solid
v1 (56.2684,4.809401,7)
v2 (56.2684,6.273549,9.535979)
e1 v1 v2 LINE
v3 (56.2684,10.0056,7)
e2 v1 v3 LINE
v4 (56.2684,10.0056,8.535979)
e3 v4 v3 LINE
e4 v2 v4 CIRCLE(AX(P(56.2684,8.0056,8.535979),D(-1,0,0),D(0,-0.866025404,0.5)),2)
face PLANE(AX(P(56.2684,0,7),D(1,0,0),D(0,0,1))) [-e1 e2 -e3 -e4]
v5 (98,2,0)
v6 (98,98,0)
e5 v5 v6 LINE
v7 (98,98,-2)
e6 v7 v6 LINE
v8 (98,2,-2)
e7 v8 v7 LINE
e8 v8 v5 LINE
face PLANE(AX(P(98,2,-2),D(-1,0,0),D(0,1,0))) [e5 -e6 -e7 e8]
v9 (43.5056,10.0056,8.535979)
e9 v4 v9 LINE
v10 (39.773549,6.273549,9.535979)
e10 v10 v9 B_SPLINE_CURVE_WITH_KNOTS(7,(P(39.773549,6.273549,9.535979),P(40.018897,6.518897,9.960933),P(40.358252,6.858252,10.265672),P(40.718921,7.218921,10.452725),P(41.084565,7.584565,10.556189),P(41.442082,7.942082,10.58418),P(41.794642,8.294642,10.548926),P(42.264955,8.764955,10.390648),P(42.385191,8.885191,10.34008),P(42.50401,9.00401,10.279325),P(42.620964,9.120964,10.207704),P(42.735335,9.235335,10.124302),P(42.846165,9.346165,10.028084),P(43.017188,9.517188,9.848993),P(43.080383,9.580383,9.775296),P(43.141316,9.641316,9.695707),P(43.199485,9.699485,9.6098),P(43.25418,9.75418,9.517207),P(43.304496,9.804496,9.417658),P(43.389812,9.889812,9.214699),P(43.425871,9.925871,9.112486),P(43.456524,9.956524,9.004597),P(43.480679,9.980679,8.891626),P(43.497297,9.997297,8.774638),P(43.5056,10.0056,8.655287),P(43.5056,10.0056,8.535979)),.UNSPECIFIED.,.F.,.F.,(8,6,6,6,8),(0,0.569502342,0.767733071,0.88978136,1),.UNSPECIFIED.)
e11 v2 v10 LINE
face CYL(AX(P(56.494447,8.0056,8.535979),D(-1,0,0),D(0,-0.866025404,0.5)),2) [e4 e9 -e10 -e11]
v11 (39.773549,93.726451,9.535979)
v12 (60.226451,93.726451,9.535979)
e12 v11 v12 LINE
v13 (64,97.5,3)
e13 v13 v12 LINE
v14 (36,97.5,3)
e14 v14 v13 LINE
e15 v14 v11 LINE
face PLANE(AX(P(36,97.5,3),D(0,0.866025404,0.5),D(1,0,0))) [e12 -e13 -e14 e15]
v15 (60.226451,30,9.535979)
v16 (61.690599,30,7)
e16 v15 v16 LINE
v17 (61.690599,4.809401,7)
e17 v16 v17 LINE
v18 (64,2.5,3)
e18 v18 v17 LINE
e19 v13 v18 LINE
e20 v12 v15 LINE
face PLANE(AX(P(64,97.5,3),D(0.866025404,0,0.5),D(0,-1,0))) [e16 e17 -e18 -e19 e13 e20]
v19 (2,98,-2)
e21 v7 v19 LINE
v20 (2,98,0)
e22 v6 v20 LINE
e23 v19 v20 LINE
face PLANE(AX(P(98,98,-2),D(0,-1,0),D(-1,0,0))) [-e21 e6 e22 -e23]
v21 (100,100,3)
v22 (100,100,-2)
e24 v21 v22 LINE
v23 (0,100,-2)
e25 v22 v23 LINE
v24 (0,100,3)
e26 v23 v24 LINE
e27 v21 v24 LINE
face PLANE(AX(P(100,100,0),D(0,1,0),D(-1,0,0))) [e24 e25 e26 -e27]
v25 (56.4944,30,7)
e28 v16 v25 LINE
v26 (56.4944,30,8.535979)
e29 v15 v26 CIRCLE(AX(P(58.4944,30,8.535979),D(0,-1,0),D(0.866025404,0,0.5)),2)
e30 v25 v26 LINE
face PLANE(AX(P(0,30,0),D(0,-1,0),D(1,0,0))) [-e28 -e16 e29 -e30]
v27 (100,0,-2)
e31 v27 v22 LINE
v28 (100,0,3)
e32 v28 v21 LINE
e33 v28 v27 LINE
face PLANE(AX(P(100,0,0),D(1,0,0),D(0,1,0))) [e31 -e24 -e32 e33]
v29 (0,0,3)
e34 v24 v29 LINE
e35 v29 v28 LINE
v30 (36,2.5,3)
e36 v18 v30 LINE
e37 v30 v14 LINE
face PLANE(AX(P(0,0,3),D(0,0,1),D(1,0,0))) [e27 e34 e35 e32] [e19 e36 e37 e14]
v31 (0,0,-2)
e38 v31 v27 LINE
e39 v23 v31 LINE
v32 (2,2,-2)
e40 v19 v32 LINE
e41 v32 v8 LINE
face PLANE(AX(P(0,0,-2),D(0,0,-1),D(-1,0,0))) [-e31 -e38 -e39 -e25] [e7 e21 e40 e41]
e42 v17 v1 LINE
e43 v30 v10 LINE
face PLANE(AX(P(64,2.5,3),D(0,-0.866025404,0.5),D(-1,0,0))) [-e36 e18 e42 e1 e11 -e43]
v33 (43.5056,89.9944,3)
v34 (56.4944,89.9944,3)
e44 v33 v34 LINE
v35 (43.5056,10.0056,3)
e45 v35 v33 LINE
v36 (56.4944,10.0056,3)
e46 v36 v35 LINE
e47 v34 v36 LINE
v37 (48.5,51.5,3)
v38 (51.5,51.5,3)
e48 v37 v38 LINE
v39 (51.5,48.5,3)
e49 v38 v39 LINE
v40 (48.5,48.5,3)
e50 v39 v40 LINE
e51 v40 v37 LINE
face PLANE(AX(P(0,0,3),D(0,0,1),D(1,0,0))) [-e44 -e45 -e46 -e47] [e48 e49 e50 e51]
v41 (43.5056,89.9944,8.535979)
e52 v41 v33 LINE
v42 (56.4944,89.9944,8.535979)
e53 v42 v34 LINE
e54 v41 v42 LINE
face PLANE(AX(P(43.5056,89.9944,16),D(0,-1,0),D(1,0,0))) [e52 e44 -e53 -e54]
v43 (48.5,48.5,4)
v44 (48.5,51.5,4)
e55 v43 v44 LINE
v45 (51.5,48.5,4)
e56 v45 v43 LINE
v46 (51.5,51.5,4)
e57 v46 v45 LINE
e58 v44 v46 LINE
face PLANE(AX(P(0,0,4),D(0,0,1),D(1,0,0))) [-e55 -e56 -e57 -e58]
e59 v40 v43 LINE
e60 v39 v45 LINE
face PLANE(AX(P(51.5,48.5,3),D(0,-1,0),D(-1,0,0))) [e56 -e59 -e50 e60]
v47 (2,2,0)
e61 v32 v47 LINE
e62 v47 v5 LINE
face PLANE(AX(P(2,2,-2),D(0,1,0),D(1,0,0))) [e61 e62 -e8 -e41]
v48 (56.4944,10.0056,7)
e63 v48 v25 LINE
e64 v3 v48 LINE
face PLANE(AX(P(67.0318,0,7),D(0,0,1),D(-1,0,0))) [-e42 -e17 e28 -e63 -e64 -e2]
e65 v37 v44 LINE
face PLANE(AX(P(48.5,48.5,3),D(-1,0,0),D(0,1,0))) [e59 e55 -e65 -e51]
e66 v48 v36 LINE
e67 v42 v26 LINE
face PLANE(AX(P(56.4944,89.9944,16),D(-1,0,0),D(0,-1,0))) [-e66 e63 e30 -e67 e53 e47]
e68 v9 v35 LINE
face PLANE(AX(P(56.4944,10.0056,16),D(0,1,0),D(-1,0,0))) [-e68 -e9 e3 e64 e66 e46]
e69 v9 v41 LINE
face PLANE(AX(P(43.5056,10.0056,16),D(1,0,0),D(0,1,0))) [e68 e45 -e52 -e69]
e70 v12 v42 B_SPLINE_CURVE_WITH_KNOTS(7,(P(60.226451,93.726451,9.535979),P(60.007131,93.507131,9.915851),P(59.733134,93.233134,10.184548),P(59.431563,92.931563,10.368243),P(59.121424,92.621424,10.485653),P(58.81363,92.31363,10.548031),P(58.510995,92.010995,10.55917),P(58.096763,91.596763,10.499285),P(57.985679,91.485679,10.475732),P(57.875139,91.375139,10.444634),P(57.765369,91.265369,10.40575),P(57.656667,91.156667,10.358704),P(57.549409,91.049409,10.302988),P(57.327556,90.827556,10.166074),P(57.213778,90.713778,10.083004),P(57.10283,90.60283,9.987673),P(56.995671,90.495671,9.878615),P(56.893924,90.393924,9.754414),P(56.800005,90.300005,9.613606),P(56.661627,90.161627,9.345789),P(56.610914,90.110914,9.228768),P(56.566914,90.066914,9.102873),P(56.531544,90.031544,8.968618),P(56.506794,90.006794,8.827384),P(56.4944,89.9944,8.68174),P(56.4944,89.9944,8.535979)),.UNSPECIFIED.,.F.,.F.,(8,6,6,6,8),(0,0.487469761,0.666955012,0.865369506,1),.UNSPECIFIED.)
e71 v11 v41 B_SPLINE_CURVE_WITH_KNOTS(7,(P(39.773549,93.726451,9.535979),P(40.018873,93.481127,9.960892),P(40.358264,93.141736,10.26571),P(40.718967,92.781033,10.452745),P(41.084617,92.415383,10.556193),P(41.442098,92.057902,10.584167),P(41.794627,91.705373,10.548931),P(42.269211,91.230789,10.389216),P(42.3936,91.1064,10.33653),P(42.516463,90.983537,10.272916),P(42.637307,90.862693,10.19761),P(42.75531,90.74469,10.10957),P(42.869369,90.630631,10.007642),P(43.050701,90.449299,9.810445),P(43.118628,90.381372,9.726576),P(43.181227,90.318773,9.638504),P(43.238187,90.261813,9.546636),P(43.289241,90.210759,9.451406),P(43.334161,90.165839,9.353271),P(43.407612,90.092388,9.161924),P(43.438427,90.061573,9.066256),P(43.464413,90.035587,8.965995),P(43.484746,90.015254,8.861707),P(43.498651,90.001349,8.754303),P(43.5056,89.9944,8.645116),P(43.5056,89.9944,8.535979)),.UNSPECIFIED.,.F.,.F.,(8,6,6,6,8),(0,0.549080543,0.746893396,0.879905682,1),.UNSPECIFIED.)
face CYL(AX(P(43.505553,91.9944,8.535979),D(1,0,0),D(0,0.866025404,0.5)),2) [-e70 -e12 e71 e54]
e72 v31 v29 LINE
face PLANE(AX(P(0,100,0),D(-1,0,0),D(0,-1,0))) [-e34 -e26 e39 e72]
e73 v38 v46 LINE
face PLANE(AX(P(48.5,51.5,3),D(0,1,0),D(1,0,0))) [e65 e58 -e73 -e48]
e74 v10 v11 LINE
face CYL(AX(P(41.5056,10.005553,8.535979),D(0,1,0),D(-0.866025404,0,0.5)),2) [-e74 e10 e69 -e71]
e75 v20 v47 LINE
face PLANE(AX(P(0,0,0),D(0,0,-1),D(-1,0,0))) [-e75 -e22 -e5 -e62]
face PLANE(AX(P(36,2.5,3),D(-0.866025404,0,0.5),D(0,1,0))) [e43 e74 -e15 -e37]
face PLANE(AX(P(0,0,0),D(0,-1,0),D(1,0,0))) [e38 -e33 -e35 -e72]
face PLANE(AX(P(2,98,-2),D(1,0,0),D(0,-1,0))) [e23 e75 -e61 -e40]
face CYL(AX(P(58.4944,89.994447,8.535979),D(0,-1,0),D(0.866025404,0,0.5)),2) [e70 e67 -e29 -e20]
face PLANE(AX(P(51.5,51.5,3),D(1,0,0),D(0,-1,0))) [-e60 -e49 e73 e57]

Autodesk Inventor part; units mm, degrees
ref_plane "YZ Plane" through (0, 0, 0) normal (1, 0, 0) x (0, 1, 0)
ref_plane "XZ Plane" through (0, 0, 0) normal (0, 1, 0) x (-1, 0, 0)
ref_plane "XY Plane" through (0, 0, 0) normal (0, 0, 1) x (1, 0, 0)
sketch "Sketch1" plane through (0, 0, 0) normal (0, 0, 1) x (1, 0, 0)
  line L0 (0, 0) -> (100, 0)
  line L1 (100, 0) -> (100, 100)
  line L2 (100, 100) -> (0, 100)
  line L3 (0, 100) -> (0, 0)
  dimension "d0" = 100
  dimension "d1" = 100
extrude "Extrusion1" add sketch "Sketch1" along normal blind 3
sketch "Sketch2" plane through (0, 0, 3) normal (0, 0, 1) x (1, 0, 0)
  line L0 (36, 97.5) -> (64, 97.5)
  line L1 (64, 97.5) -> (64, 2.5)
  line L2 (64, 2.5) -> (36, 2.5)
  line L3 (36, 2.5) -> (36, 97.5)
  line L4 (0, 0) -> (100, 0) projected
  line L5 (0, 100) -> (0, 0) projected
  dimension "d6" = 28
  dimension "d7" = 95
  dimension "d8" = 2.5
  dimension "d9" = 36
extrude "Extrusion2" add sketch "Sketch2" along normal blind 13 draft -30
sketch "Sketch4" plane through (0, 0, 16) normal (0, 0, 1) x (1, 0, 0)
  line L0 (43.5056, 10.0056) -> (43.5056, 89.9944) projected
  line L1 (56.4944, 10.0056) -> (43.5056, 10.0056) projected
  line L2 (56.4944, 89.9944) -> (56.4944, 10.0056) projected
  line L3 (43.5056, 89.9944) -> (56.4944, 89.9944) projected
  point P0 (0, 0)
extrude "Extrusion3" cut sketch "Sketch4" against normal blind 13
sketch "Sketch5" plane through (0, 0, 0) normal (0, -1, 0) x (1, 0, 0)
  line L0 (56.4944, 16) -> (43.5056, 16) projected
  line L1 (43.5056, 16) -> (56.4944, 16) projected
  line L2 (56.2684, 16) -> (67.0318, 16)
  line L3 (67.0318, 16) -> (67.0318, 7)
  line L4 (67.0318, 7) -> (56.2684, 7)
  line L5 (56.2684, 7) -> (56.2684, 16)
  point P0 (0, 0)
  dimension "d14" = 9
fillet "Fillet1" radius 2 4 edges at (50, 10.0056, 16) (56.4944, 50, 16) (43.5056, 50, 16) (50, 89.9944, 16)
extrude "Extrusion4" cut sketch "Sketch5" against normal blind 30
sketch "Sketch6" plane through (0, 0, 0) normal (0, 0, -1) x (-1, 0, 0)
  line L0 (-100, 100) -> (0, 100) projected
  line L1 (0, 0) -> (-100, 0) projected
  line L2 (-100, 100) -> (0, 100)
  line L3 (0, 100) -> (0, 0)
  line L4 (0, 0) -> (-100, 0)
  line L5 (-100, 0) -> (-100, 100)
extrude "Extrusion5" add sketch "Sketch6" along normal blind 2
sketch "Sketch7" plane through (0, 0, -2) normal (0, 0, -1) x (-1, 0, 0)
  line L0 (-98, 98) -> (-2, 98)
  line L1 (-2, 98) -> (-2, 2)
  line L2 (-2, 2) -> (-98, 2)
  line L3 (-98, 2) -> (-98, 98)
  line L4 (0, 100) -> (-100, 100) projected
  line L5 (-100, 100) -> (-100, 0) projected
  line L6 (-100, 0) -> (0, 0) projected
  line L7 (0, 0) -> (0, 100) projected
  dimension "d19" = 2
  dimension "d20" = 2
  dimension "d21" = 2
  dimension "d22" = 2
extrude "Extrusion6" cut sketch "Sketch7" against normal blind 2 contours L0 L1 L2 L3
sketch "Sketch8" plane through (0, 0, 3) normal (0, 0, 1) x (1, 0, 0)
  line L0 (48.5, 51.5) -> (51.5, 51.5)
  line L1 (51.5, 51.5) -> (51.5, 48.5)
  line L2 (51.5, 48.5) -> (48.5, 48.5)
  line L3 (48.5, 48.5) -> (48.5, 51.5)
  line L4 (0, 100) -> (0, 0) projected
  line L5 (100, 100) -> (0, 100) projected
  dimension "d25" = 3
  dimension "d26" = 3
  dimension "d27" = 48.5
  dimension "d28" = 48.5
extrude "Extrusion7" add sketch "Sketch8" along normal blind 1
properties part number "Weight_Plate"
